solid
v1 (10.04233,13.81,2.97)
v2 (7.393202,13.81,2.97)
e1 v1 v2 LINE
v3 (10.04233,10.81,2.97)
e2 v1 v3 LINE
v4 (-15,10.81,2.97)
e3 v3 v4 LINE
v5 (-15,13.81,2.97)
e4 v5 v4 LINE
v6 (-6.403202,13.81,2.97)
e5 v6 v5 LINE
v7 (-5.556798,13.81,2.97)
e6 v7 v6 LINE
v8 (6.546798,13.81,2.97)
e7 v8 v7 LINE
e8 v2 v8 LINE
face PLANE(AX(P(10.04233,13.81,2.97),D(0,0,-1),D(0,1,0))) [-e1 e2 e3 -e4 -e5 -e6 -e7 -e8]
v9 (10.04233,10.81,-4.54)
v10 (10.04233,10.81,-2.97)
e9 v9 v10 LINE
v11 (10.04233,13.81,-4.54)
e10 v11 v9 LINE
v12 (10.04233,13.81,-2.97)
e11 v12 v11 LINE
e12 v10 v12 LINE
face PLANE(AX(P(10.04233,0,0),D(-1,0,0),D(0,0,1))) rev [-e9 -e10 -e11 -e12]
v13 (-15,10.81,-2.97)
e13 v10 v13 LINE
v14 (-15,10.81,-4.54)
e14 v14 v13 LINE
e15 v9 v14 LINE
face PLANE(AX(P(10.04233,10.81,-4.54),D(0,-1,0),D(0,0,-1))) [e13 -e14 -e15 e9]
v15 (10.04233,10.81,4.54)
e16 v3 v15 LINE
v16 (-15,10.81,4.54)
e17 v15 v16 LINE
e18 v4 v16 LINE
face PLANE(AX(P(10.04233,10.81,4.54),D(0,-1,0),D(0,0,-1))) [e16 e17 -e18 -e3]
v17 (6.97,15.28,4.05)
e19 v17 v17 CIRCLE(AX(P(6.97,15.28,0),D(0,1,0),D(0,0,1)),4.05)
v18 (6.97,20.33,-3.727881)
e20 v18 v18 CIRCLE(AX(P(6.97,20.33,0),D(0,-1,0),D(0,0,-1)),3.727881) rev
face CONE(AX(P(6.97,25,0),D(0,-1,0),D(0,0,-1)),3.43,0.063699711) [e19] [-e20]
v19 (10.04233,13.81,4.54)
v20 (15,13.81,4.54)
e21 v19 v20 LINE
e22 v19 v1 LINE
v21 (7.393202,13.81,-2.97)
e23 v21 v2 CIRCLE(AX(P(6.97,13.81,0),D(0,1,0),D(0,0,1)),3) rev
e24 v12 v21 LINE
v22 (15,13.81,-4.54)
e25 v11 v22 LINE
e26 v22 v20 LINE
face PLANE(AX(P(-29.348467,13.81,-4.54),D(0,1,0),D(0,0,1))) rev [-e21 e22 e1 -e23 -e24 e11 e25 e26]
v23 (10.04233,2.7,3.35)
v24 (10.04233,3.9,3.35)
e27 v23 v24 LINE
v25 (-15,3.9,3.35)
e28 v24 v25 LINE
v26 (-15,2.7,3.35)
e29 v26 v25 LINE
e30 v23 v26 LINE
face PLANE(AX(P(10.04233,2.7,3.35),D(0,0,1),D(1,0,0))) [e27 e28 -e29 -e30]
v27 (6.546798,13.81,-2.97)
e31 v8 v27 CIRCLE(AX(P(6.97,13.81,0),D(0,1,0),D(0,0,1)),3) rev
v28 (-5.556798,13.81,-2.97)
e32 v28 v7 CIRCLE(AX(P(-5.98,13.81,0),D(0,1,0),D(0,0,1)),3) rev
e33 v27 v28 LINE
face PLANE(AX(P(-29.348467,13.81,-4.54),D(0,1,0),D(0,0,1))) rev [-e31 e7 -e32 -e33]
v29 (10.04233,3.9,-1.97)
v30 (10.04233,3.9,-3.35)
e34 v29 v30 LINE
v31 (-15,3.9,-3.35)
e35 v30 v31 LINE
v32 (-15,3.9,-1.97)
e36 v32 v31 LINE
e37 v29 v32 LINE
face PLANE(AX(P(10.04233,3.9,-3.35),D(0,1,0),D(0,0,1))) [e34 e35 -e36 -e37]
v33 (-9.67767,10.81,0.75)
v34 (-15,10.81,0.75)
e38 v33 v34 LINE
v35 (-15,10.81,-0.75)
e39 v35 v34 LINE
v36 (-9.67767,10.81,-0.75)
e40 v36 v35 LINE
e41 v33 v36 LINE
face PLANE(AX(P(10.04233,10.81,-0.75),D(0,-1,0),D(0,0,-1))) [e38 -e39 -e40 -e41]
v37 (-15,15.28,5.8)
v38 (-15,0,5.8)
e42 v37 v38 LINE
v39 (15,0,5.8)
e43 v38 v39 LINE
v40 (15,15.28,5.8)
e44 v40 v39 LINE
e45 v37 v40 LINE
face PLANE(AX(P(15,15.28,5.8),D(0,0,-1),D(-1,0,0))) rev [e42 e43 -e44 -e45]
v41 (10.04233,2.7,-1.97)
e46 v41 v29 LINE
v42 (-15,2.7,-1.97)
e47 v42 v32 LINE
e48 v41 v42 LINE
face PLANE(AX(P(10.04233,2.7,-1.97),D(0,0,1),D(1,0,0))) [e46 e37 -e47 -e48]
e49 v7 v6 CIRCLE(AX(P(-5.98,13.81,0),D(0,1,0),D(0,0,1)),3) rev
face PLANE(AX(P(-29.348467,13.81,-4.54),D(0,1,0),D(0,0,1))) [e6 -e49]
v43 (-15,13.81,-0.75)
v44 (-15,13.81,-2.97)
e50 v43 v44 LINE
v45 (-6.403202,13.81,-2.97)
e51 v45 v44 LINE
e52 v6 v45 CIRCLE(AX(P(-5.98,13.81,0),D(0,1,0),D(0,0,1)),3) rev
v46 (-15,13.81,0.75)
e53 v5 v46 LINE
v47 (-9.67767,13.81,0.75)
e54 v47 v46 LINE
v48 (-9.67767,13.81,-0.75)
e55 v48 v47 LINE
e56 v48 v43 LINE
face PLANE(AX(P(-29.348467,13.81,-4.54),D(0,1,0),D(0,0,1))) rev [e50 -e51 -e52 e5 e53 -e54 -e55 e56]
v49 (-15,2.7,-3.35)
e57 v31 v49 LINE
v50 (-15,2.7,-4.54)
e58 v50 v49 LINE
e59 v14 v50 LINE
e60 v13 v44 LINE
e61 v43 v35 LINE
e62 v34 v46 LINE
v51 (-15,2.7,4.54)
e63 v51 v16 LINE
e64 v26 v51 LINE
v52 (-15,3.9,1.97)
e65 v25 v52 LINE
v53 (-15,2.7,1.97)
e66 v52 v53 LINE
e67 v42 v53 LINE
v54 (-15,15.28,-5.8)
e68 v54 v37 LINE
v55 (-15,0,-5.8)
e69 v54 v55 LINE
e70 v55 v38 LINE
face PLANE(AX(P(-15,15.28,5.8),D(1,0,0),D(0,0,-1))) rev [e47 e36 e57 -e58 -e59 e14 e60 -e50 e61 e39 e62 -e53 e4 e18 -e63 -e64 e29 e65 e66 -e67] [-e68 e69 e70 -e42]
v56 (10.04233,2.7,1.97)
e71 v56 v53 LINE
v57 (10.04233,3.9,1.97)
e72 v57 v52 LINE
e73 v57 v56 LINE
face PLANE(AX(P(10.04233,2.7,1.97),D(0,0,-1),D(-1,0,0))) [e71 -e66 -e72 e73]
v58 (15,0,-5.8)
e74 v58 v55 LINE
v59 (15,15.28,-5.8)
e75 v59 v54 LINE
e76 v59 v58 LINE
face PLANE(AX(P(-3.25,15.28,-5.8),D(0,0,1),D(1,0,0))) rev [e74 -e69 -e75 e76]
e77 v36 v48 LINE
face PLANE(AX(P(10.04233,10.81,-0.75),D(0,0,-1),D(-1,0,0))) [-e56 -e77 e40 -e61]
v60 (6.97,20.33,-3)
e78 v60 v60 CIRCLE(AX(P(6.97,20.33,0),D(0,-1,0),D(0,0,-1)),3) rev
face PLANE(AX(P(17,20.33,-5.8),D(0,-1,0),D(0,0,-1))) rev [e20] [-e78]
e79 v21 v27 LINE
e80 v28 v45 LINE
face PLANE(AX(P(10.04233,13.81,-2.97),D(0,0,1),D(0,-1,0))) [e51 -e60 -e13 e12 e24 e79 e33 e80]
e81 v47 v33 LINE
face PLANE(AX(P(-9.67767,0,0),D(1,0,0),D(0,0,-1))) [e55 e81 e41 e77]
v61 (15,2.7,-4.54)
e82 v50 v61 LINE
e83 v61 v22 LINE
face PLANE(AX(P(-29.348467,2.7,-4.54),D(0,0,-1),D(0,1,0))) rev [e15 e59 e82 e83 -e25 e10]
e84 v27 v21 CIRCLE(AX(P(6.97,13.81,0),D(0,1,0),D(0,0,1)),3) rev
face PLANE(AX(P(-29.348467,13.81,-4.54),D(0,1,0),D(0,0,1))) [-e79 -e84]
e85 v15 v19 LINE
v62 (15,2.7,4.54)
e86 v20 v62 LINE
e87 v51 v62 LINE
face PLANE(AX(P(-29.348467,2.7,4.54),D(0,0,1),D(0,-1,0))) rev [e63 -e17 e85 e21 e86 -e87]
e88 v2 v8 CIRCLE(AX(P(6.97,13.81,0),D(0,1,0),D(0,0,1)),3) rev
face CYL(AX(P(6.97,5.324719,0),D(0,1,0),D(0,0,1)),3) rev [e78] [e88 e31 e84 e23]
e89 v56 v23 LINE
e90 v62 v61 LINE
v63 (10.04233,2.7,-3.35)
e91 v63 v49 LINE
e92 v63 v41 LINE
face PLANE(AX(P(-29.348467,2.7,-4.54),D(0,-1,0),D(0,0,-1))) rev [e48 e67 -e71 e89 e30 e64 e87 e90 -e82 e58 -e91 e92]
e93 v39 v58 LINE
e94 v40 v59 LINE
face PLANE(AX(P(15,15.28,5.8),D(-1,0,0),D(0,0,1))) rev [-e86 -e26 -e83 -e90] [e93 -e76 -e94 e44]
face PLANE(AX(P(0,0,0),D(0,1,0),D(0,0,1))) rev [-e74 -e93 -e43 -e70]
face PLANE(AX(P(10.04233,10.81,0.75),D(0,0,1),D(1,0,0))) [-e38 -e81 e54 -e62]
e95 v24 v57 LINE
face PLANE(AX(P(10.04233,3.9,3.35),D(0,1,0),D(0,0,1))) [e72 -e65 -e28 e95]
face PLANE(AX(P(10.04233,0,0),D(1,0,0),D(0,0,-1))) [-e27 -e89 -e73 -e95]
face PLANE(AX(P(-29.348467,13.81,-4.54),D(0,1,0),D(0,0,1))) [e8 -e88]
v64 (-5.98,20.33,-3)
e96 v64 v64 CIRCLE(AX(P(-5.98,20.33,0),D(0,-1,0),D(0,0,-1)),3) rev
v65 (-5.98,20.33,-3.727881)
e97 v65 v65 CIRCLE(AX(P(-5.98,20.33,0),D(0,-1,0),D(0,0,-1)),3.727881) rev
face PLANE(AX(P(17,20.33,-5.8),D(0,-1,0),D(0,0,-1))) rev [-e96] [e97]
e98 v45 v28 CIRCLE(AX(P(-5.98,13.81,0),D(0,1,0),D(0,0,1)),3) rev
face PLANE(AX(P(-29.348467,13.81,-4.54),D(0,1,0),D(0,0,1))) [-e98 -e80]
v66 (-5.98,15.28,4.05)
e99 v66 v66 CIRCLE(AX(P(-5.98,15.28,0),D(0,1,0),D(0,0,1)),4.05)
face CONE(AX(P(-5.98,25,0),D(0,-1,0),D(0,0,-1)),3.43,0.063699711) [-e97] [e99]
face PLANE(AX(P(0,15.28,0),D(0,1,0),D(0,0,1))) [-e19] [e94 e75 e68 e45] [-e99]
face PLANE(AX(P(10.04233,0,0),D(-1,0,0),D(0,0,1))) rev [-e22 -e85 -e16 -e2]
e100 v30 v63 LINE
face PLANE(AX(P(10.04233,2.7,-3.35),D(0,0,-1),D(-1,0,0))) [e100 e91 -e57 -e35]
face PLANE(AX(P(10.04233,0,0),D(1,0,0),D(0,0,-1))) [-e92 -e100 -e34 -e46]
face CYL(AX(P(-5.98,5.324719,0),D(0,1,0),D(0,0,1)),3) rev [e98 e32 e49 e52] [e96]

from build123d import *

# Parameters (mm, degrees)
BOSS_EXTRUDE1_DEPTH = 15.28
SKETCH2_R           = 4.05
BOSS_EXTRUDE2_DEPTH = 9.72
CHAMFER1_SIZE       = 9.72
CHAMFER1_SIZE_2     = 0.62
CHAMFER2_SIZE       = 9.72
CHAMFER2_SIZE_2     = 0.62
SKETCH4_W           = 9.08
SKETCH4_H           = 11.11
CUT_EXTRUDE1_DEPTH  = 30
SKETCH6_W           = 1.5
SKETCH6_H           = 3
SKETCH6_W_2         = 1.57
SKETCH6_W_3         = 1.38
SKETCH6_H_2         = 1.2
BOSS_EXTRUDE3_DEPTH = 25.04233017
SKETCH7_W           = 1.5
SKETCH7_H           = 3
CUT_EXTRUDE2_DEPTH  = 19.72
SKETCH8_R           = 3
CUT_EXTRUDE3_DEPTH  = 11.19
SKETCH9_W           = 11.6
SKETCH9_H           = 4.67
CUT_EXTRUDE4_DEPTH  = 32


with BuildPart() as part:
    # Sketch1 → Boss-Extrude1 (new body)
    with BuildSketch(Plane(origin=(0, 0, 0), x_dir=(1, 0, 0), z_dir=(0, 1, 0))):
        Polygon((-3.25, 5.8), (-15, 5.8), (-15, -5.8), (15, -5.8), (15, 5.8), (3.25, 5.8), align=None)
    extrude(amount=BOSS_EXTRUDE1_DEPTH)

    # Sketch2 → Boss-Extrude2 (add)
    with BuildSketch(Plane(origin=(0, 15.28, 0), x_dir=(1, 0, 0), z_dir=(0, 1, 0))):
        with Locations(Location((-5.98, 0, 0), (0, 0, 270))):
            Circle(SKETCH2_R)
        with Locations(Location((6.97, 0, 0), (0, 0, 270))):
            Circle(SKETCH2_R)
    extrude(amount=BOSS_EXTRUDE2_DEPTH)

    # Chamfer1
    # the kernel refuses this chamfer: 9.72, 0.62 mm, written as the material it takes off along each edge
    with BuildSketch(Plane(origin=(-5.98, 25, 0), x_dir=(0, 0, 1), z_dir=(-1, 0, 0))) as chamfer1_piece_1_section:
        Polygon((4.05, -CHAMFER1_SIZE), (4.05 - CHAMFER1_SIZE_2, 0), (4.05, 0), align=None)
    chamfer1_piece_1 = revolve(axis=Axis((-5.98, 25, 0), (0, 1, 0)), mode=Mode.PRIVATE)
    chamfer1_piece_1 = split(chamfer1_piece_1, bisect_by=Plane(origin=(-5.98, 15.28, -3.777775081), z_dir=(0, 1, 0)), keep=Keep.TOP, mode=Mode.PRIVATE)
    add(chamfer1_piece_1, mode=Mode.SUBTRACT)

    # Chamfer2
    # the kernel refuses this chamfer: 9.72, 0.62 mm, written as the material it takes off along each edge
    with BuildSketch(Plane(origin=(6.97, 25, 0), x_dir=(0, 0, 1), z_dir=(-1, 0, 0))) as chamfer2_piece_1_section:
        Polygon((4.05, -CHAMFER2_SIZE), (4.05 - CHAMFER2_SIZE_2, 0), (4.05, 0), align=None)
    chamfer2_piece_1 = revolve(axis=Axis((6.97, 25, 0), (0, 1, 0)), mode=Mode.PRIVATE)
    chamfer2_piece_1 = split(chamfer2_piece_1, bisect_by=Plane(origin=(6.97, 15.28, -3.777775081), z_dir=(0, 1, 0)), keep=Keep.TOP, mode=Mode.PRIVATE)
    add(chamfer2_piece_1, mode=Mode.SUBTRACT)

    # Sketch4 → Cut-Extrude1 (cut)
    with BuildSketch(Plane(origin=(15, 0, 0), x_dir=(0, 0, -1), z_dir=(1, 0, 0))):
        with Locations((0, 8.255)):
            Rectangle(SKETCH4_W, SKETCH4_H)
    extrude(amount=-CUT_EXTRUDE1_DEPTH, mode=Mode.SUBTRACT)

    # Sketch6 → Boss-Extrude3 (add)
    with BuildSketch(Plane.ZY.offset(15)):
        with Locations((0, 12.31)):
            Rectangle(SKETCH6_W, SKETCH6_H)
        with Locations((-3.755, 12.31)):
            Rectangle(SKETCH6_W_2, SKETCH6_H)
        with Locations((-2.66, 3.3)):
            Rectangle(SKETCH6_W_3, SKETCH6_H_2)
        with Locations((2.66, 3.3)):
            Rectangle(SKETCH6_W_3, SKETCH6_H_2)
        with Locations((3.755, 12.31)):
            Rectangle(SKETCH6_W_2, SKETCH6_H)
    extrude(amount=-BOSS_EXTRUDE3_DEPTH)

    # Sketch7 → Cut-Extrude2 (cut)
    with BuildSketch(Plane(origin=(10.04233017, 0, 0), x_dir=(0, 0, -1), z_dir=(1, 0, 0))):
        with Locations((0, 12.31)):
            Rectangle(SKETCH7_W, SKETCH7_H)
    extrude(amount=-CUT_EXTRUDE2_DEPTH, mode=Mode.SUBTRACT)

    # Sketch8 → Cut-Extrude3 (cut)
    with BuildSketch(Plane(origin=(0, 25, 0), x_dir=(1, 0, 0), z_dir=(0, 1, 0))):
        with Locations(Location((6.97, 0, 0), (0, 0, 270))):
            Circle(SKETCH8_R)
        with Locations(Location((-5.98, 0, 0), (0, 0, 270))):
            Circle(SKETCH8_R)
    extrude(amount=-CUT_EXTRUDE3_DEPTH, mode=Mode.SUBTRACT)

    # Sketch9 → Cut-Extrude4 (cut)
    with BuildSketch(Plane.ZY.offset(15)):
        with Locations((0, 22.665)):
            Rectangle(SKETCH9_W, SKETCH9_H)
    extrude(amount=-CUT_EXTRUDE4_DEPTH, mode=Mode.SUBTRACT)


solid = part.part
